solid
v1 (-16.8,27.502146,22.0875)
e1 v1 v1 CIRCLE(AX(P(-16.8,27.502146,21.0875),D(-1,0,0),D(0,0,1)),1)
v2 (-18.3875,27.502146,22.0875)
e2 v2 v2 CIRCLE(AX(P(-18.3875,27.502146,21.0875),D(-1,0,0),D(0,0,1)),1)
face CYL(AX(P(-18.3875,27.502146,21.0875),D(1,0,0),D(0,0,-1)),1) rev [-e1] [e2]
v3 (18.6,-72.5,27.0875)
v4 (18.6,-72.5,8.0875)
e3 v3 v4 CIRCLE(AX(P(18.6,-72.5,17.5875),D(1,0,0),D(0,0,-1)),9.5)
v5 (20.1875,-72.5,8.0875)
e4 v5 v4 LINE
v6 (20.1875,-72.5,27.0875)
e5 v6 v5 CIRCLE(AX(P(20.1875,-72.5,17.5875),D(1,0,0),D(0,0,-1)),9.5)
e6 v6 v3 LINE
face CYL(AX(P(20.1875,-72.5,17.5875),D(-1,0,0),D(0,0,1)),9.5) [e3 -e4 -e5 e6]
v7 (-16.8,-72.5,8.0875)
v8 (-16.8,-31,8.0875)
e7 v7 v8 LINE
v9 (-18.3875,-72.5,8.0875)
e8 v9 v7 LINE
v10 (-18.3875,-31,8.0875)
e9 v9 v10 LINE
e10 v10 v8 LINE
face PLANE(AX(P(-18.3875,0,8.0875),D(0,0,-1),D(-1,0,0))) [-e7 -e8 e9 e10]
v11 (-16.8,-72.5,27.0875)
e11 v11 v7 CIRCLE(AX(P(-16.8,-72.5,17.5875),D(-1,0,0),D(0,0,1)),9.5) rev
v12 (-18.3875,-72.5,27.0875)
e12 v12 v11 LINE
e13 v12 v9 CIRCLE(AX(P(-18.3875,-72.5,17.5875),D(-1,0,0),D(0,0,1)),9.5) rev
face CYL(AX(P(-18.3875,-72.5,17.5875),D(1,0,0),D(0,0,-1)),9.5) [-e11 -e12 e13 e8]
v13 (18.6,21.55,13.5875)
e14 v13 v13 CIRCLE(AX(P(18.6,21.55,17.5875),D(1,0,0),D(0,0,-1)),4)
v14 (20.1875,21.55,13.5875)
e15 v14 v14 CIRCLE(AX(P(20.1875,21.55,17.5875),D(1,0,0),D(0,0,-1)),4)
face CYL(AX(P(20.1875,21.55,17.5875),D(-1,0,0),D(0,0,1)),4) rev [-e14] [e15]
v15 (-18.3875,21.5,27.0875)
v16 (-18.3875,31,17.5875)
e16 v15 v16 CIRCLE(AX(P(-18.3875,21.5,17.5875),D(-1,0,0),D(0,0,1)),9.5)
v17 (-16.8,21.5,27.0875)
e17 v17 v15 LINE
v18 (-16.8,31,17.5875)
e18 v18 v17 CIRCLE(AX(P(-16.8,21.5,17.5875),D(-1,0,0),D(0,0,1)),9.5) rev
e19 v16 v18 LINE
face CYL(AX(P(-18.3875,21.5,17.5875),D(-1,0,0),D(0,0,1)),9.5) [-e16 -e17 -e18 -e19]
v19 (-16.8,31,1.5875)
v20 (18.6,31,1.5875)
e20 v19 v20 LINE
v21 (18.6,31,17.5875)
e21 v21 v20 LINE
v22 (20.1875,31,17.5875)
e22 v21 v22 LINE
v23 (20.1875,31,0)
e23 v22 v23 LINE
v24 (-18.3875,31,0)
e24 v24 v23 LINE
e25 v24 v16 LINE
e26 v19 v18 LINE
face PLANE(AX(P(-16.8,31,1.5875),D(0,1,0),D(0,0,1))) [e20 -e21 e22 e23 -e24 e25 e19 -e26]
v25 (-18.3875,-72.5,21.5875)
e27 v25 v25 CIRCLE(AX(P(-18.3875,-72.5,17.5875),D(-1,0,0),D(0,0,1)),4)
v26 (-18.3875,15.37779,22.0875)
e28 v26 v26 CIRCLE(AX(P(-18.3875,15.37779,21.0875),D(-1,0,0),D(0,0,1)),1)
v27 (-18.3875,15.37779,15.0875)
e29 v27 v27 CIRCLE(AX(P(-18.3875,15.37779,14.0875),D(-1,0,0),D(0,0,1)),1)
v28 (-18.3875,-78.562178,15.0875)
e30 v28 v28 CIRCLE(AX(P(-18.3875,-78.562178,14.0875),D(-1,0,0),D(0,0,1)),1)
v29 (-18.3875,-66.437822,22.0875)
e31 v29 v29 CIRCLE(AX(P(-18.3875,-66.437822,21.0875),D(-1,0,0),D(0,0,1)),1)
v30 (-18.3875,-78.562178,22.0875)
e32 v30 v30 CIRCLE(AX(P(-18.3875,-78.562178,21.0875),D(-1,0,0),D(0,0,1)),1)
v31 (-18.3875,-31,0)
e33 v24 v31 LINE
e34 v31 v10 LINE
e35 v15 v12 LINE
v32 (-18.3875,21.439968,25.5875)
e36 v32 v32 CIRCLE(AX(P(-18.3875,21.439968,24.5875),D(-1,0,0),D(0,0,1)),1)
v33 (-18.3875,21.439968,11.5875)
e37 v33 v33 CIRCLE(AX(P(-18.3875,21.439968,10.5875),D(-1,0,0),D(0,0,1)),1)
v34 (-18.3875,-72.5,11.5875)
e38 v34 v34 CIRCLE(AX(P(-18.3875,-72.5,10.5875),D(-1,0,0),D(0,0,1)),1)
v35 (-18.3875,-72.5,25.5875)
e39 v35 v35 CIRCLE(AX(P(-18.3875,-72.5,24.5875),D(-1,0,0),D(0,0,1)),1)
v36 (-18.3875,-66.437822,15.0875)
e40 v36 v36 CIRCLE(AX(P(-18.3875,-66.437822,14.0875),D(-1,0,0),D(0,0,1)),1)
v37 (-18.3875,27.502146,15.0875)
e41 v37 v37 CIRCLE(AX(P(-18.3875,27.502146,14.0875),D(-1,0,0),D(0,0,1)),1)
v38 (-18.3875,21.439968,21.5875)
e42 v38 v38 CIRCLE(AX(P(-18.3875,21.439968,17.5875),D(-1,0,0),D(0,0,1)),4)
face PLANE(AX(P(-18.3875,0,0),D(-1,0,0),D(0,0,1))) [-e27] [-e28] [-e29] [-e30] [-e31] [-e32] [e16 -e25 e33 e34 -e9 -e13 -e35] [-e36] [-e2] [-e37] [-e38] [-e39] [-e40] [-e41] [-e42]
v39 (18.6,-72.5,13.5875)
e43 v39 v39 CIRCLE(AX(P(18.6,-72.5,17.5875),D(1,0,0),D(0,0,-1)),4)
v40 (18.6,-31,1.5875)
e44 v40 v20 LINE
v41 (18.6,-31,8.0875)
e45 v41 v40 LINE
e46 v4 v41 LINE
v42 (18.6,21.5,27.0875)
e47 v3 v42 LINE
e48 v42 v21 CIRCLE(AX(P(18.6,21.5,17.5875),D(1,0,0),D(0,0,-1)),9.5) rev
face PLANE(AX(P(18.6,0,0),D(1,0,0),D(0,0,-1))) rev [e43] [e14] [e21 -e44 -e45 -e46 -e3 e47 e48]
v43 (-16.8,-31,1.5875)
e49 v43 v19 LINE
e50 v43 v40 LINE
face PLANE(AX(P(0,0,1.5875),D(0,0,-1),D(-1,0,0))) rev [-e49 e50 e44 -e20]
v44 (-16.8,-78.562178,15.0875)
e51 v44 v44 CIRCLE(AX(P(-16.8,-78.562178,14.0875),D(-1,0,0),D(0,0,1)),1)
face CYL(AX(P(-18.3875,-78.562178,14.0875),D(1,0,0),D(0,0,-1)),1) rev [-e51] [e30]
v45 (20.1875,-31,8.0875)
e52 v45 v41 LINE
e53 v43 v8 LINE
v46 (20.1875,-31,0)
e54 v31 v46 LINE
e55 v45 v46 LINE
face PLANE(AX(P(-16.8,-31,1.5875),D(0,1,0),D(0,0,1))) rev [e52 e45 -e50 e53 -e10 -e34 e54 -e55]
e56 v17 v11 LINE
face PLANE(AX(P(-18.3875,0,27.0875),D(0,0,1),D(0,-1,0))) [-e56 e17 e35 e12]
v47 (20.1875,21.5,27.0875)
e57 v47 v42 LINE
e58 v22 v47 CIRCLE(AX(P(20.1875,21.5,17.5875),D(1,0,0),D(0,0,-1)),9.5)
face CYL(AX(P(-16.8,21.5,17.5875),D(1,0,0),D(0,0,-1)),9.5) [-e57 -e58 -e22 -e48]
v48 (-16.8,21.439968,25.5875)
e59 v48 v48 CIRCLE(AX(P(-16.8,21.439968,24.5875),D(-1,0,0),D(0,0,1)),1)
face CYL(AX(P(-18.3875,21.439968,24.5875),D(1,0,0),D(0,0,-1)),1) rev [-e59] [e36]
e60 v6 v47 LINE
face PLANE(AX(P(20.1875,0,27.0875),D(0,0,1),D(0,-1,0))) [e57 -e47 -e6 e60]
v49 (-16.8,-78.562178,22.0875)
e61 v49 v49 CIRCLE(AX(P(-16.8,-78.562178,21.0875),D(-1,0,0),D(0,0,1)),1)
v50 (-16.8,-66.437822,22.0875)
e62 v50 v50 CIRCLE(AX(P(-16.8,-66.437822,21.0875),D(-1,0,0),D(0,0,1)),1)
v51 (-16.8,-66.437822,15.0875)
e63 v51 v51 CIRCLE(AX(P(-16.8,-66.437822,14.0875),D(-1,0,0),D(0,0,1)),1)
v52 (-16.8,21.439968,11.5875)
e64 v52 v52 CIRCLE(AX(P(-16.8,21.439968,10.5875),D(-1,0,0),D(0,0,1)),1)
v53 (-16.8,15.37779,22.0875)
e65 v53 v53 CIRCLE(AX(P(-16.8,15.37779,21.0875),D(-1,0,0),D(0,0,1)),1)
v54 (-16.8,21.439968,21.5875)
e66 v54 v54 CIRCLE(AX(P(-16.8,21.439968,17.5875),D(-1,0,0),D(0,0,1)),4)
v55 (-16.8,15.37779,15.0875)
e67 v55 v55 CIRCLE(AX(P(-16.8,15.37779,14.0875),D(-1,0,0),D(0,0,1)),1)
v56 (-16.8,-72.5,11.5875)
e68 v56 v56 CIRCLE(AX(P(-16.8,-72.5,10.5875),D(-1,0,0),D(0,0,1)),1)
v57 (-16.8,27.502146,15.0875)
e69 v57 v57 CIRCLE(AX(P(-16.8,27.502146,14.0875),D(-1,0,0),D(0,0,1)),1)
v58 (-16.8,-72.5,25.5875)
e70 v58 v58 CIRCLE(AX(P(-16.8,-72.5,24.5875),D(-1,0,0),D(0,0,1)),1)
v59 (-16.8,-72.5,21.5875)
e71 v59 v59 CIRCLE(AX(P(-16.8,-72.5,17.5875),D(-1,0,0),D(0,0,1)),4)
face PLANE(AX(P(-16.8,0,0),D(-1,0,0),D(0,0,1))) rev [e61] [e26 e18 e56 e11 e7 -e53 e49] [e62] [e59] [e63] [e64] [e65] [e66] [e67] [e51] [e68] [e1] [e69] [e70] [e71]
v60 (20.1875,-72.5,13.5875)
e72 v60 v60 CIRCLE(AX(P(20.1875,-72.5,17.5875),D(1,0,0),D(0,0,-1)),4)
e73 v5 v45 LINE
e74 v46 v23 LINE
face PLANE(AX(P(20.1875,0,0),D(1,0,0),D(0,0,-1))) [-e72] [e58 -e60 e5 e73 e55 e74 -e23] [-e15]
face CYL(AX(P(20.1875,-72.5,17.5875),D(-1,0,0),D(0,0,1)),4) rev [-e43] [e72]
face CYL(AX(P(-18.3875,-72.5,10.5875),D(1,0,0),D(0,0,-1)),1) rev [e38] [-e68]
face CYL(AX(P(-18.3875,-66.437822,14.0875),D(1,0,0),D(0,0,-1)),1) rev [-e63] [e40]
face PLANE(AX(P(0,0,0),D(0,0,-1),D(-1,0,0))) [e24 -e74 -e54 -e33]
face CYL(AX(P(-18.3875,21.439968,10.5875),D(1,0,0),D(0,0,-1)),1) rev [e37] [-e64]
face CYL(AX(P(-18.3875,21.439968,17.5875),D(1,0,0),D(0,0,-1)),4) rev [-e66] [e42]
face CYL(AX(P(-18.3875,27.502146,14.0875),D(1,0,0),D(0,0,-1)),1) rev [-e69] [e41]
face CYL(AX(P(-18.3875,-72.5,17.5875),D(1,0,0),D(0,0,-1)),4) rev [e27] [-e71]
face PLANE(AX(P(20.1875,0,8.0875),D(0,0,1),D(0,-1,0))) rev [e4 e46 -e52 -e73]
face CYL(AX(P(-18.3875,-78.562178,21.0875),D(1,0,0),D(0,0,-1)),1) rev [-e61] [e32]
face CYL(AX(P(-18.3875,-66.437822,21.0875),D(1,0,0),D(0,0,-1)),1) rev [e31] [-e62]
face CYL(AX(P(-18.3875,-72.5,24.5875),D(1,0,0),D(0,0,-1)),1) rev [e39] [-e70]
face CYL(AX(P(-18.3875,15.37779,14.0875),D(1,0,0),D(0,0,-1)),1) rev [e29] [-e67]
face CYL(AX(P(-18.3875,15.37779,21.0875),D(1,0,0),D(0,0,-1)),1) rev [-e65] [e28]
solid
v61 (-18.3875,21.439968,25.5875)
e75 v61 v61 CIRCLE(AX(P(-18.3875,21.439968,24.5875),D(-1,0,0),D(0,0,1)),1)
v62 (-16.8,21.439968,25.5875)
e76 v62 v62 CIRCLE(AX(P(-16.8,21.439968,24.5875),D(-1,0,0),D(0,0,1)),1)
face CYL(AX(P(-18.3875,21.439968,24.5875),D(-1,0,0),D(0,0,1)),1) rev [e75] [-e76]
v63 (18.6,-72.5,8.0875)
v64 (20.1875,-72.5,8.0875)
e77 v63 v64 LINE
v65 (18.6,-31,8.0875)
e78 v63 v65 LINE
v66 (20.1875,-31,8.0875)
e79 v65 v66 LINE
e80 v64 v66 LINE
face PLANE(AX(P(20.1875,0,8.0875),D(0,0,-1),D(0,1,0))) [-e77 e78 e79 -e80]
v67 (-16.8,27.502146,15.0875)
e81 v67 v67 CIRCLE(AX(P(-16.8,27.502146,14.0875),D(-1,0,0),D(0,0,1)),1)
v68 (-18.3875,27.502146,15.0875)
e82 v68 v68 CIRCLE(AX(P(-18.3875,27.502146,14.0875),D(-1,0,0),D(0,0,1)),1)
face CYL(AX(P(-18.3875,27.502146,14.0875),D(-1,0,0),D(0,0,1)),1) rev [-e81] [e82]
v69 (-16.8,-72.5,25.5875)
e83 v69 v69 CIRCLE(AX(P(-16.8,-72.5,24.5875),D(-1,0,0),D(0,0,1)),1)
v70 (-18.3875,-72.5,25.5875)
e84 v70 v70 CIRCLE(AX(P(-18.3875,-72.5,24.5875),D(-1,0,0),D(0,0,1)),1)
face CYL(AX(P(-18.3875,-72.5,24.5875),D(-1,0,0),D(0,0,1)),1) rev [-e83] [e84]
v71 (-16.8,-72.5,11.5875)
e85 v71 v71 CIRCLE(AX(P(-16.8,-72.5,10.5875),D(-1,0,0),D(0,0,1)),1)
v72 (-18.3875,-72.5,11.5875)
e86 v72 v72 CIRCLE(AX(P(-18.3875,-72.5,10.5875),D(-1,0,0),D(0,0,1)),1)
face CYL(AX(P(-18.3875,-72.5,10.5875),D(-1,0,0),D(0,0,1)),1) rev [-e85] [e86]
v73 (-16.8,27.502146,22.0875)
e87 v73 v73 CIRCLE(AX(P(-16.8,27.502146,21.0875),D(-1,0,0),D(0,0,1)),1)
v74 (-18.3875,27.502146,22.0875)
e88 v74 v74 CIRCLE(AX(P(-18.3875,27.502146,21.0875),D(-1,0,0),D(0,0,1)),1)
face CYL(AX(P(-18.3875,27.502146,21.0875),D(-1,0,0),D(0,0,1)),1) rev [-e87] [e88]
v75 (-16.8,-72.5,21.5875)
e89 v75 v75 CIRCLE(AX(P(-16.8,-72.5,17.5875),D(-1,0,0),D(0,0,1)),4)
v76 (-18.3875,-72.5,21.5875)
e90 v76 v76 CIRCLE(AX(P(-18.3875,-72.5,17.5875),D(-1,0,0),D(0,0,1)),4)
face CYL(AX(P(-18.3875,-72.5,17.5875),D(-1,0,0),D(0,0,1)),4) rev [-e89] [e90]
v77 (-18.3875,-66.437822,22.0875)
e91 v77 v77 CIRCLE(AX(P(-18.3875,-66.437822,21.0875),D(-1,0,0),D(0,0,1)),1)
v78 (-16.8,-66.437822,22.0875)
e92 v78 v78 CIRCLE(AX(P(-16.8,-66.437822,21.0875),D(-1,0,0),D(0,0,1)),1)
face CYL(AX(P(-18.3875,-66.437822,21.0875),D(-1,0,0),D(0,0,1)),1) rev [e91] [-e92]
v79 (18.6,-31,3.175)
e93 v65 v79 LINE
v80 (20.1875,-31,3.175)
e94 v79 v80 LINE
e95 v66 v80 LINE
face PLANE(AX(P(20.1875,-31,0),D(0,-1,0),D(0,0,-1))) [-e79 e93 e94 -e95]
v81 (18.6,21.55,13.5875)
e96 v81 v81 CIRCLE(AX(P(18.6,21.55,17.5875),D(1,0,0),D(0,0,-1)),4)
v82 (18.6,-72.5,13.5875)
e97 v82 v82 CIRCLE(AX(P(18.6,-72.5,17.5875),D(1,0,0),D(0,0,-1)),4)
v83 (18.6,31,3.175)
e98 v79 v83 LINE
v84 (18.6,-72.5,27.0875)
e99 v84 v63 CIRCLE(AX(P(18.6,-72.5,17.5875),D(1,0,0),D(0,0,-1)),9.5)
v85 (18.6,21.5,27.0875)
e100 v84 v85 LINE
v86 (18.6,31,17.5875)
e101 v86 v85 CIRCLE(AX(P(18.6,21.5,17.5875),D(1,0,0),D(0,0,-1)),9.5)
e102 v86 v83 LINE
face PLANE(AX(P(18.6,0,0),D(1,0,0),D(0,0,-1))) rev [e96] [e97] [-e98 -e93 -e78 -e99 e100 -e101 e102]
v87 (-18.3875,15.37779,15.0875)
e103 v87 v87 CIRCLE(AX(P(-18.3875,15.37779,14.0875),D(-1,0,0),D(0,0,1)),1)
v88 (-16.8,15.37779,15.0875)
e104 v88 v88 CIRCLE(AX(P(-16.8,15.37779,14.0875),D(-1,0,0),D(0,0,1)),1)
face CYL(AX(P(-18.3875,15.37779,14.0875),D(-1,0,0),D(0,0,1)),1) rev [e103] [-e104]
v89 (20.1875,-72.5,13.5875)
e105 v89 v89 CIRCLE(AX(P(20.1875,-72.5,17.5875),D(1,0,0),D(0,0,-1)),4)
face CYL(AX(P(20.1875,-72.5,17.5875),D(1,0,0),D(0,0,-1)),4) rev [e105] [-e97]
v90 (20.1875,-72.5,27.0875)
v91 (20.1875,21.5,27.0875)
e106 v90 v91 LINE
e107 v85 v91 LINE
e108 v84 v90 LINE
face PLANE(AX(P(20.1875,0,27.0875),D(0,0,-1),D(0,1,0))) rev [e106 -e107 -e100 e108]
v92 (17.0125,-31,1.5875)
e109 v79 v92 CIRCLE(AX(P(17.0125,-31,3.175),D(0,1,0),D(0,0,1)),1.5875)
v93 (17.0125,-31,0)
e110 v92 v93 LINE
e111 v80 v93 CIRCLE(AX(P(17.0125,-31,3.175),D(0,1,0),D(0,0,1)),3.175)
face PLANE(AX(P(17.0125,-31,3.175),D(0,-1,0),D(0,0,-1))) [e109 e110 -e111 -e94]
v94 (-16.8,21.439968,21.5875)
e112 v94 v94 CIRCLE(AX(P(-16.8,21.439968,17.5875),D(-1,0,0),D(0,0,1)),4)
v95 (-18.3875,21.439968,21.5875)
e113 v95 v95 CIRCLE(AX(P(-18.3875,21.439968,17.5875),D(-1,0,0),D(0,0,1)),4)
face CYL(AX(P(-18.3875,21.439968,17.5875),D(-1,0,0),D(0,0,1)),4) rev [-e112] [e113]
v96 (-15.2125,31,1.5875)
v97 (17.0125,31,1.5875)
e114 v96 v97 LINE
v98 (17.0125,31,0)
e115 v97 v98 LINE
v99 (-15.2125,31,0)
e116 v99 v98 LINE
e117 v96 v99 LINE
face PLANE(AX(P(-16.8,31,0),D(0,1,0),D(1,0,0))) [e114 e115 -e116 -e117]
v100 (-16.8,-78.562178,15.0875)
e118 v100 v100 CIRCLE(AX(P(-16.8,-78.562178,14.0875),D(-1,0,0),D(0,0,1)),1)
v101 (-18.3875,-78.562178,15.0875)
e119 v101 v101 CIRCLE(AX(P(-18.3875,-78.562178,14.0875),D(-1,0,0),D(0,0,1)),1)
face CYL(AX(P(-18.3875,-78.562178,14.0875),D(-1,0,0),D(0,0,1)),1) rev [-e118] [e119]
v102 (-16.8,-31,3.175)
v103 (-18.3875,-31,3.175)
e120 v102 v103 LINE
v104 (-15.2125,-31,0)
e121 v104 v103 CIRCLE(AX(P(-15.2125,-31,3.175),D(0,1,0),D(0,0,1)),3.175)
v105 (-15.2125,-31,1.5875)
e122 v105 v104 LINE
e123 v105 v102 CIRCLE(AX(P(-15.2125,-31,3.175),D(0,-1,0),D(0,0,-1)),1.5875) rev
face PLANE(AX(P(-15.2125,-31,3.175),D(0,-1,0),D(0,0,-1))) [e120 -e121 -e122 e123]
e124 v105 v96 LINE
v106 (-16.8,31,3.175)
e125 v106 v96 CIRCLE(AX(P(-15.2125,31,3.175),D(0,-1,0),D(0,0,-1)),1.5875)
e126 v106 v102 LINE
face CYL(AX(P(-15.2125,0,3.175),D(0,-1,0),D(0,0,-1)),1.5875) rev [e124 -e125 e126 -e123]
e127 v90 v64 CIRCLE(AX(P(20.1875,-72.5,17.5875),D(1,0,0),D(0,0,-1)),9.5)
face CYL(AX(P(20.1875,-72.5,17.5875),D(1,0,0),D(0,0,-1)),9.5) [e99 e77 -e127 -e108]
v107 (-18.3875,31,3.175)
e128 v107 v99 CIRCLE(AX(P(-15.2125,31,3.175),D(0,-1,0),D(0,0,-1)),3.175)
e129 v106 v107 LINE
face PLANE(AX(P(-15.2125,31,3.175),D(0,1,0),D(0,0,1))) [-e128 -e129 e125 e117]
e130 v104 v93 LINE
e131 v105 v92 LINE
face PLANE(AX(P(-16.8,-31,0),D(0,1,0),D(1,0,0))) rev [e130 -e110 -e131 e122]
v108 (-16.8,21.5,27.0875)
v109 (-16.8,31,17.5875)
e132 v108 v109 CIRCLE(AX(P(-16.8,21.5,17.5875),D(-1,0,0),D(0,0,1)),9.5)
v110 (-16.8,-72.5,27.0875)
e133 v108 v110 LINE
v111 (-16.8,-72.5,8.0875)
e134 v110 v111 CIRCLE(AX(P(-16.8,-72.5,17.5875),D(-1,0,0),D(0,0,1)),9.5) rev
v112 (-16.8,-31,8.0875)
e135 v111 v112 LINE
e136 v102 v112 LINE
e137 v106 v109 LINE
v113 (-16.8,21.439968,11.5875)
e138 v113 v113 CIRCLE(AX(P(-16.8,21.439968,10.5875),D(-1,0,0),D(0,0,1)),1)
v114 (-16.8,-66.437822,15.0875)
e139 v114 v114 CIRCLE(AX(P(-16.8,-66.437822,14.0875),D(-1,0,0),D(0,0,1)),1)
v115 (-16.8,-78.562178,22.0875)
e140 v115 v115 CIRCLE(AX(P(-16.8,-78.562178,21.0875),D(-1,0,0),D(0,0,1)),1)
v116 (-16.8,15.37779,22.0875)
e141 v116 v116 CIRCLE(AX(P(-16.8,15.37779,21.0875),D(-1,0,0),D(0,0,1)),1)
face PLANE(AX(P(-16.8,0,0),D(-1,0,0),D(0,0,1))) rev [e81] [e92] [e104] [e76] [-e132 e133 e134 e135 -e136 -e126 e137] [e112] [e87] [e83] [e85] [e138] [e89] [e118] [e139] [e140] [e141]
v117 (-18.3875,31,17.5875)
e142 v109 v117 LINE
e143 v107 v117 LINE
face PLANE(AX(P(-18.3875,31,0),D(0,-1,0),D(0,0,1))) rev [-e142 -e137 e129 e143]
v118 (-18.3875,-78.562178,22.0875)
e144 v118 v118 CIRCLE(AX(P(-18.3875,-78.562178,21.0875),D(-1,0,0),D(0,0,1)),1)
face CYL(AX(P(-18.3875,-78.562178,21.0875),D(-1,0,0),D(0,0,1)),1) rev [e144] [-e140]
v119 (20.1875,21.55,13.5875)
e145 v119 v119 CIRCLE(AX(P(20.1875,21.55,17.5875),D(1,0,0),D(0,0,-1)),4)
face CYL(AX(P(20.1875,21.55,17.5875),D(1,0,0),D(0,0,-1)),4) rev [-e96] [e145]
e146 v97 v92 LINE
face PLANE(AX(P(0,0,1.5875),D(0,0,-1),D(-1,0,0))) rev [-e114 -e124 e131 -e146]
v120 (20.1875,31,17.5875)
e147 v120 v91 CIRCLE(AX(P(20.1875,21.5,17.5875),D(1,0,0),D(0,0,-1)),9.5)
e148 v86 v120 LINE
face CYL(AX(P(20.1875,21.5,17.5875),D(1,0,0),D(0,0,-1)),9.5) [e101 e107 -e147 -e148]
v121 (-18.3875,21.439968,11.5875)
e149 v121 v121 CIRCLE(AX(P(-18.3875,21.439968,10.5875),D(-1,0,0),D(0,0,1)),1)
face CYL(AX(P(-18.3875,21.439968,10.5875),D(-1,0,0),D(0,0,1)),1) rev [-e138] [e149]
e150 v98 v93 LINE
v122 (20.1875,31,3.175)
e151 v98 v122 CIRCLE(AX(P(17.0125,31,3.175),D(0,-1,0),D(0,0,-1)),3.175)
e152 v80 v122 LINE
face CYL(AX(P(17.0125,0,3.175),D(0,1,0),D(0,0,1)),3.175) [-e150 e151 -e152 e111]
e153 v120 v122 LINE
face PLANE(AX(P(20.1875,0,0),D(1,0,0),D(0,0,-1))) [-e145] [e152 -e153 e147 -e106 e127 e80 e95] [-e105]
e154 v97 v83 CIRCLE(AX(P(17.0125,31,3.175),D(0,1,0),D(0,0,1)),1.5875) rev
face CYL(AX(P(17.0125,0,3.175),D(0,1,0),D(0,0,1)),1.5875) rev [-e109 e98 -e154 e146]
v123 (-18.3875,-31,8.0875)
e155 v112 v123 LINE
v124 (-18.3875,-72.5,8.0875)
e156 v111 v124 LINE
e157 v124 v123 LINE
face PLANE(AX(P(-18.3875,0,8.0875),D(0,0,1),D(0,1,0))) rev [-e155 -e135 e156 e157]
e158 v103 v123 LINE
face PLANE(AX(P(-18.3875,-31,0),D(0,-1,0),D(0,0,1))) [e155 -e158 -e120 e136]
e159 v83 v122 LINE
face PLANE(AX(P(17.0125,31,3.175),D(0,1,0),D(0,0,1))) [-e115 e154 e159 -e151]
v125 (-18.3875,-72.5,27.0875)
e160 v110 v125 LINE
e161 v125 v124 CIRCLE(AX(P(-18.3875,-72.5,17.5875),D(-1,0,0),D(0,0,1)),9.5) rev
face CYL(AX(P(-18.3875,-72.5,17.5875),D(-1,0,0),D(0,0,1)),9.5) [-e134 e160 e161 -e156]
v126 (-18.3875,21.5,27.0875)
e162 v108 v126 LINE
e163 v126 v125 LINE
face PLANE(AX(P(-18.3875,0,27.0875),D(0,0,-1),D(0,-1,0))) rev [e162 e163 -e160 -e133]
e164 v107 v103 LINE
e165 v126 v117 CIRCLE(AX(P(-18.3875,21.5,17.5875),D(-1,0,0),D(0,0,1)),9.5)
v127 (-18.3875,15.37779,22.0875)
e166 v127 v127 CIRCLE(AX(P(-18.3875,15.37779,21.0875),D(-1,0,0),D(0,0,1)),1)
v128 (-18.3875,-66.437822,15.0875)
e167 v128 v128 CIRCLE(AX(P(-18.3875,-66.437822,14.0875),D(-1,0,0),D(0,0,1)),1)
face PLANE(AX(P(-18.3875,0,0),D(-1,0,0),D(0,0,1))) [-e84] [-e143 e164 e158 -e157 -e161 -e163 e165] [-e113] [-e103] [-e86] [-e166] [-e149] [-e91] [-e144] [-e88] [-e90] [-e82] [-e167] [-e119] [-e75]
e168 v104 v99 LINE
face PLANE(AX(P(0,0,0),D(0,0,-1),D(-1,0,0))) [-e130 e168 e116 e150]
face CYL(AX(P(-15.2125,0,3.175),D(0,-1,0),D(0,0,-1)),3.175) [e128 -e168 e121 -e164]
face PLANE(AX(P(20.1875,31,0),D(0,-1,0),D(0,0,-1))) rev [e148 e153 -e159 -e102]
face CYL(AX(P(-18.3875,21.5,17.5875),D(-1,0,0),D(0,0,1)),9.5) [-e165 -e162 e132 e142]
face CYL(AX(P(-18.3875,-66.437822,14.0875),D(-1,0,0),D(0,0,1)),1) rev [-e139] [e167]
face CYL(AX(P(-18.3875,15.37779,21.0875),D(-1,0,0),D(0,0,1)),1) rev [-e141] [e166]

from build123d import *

# Parameters (mm, degrees)
ESQUISSE2_W                      = 35.4
ESQUISSE2_H                      = 62
BOSS_EXTRU_1_DEPTH               = 1.5875
ESQUISSE3_R                      = 4
BOSS_EXTRU_2_DEPTH               = 1.5875
CONG_4_R                         = 9.5
BOSS_EXTRU_3_START               = 1.5875
ESQUISSE4_R                      = 1
ESQUISSE4_R_2                    = 4
BOSS_EXTRU_3_DEPTH               = 1.5875
CONG_7_R                         = 9.5
CONVERTIR_VOLUME1_START          = -15.2125
CONVERTIR_VOLUME1_OUTLINE_W      = 62
CONVERTIR_VOLUME1_OUTLINE_H      = 1.5875
CONVERTIR_VOLUME1_DEPTH          = 32.225
CONVERTIR_VOLUME1_START_2        = 18.6
CONVERTIR_VOLUME1_2_OUTLINE_R    = 1
CONVERTIR_VOLUME1_2_DEPTH        = 1.5875
CONVERTIR_VOLUME1_START_3        = -18.3875
CONVERTIR_VOLUME1_3_DEPTH        = 1.5875
CONVERTIR_VOLUME1_START_4        = -65.437822174
CONVERTIR_VOLUME1_4_OUTLINE_W    = 1.5875
CONVERTIR_VOLUME1_4_OUTLINE_H    = 19
CONVERTIR_VOLUME1_4_DEPTH        = 79.815612528
CONVERTIR_VOLUME1_START_5        = -31
CONVERTIR_VOLUME1_5_DEPTH        = 62
CONVERTIR_VOLUME1_START_6        = -68.4999999
CONVERTIR_VOLUME1_6_OUTLINE_W    = 1.5875
CONVERTIR_VOLUME1_6_OUTLINE_H    = 19
CONVERTIR_VOLUME1_6_DEPTH        = 86.0499998
CONVERTIR_VOLUME1_START_7        = 16.377790454
CONVERTIR_VOLUME1_7_OUTLINE_W    = 1.5875
CONVERTIR_VOLUME1_7_OUTLINE_H    = 19
CONVERTIR_VOLUME1_7_DEPTH        = 1.062177727
CONVERTIR_VOLUME1_8_OUTLINE_W    = 1.5875
CONVERTIR_VOLUME1_8_OUTLINE_H    = 19
CONVERTIR_VOLUME1_8_DEPTH        = 1.062177626
CONVERTIR_VOLUME1_9_OUTLINE_R    = 1
CONVERTIR_VOLUME1_9_OUTLINE_R_2  = 4
CONVERTIR_VOLUME1_9_DEPTH        = 1.5875
CONVERTIR_VOLUME1_10_OUTLINE_R   = 1
CONVERTIR_VOLUME1_10_OUTLINE_R_2 = 4
CONVERTIR_VOLUME1_10_DEPTH       = 1.5875


with BuildPart() as part:
    # Esquisse2 → Boss.-Extru.1 (new body)
    with BuildSketch(Plane.XY):
        with Locations((0.9, 0)):
            Rectangle(ESQUISSE2_W, ESQUISSE2_H)
    extrude(amount=BOSS_EXTRU_1_DEPTH)

    # Esquisse3 → Boss.-Extru.2 (add)
    with BuildSketch(Plane(origin=(18.6, 0, 0), x_dir=(0, 0, -1), z_dir=(1, 0, 0))):
        with BuildLine():
            Line((0, 31), (-27.0875, 31))
            Line((-27.0875, 31), (-27.0875, -72.5))
            ThreePointArc((-27.0875, -72.5), (-17.5875, -82), (-8.0875, -72.5))
            Line((-8.0875, -72.5), (-8.0875, -31))
            Line((-8.0875, -31), (0, -31))
            Line((0, -31), (0, 31))
        make_face()
        with Locations((-17.5875, -72.5)):
            Circle(ESQUISSE3_R, mode=Mode.SUBTRACT)
        with Locations((-17.5875, 21.55)):
            Circle(ESQUISSE3_R, mode=Mode.SUBTRACT)
    extrude(amount=BOSS_EXTRU_2_DEPTH)

    # Congé4
    cong_4_edges = [part.edges().sort_by_distance(p)[0] for p in [
        (19.39375, 31, 27.0875),
    ]]
    fillet(cong_4_edges, radius=CONG_4_R)

    # Esquisse4 → Boss.-Extru.3 (add)
    with BuildSketch(Plane.ZY.offset(16.8).offset(BOSS_EXTRU_3_START)):
        with BuildLine():
            Line((27.0875, 31), (0, 31))
            Line((0, 31), (0, -31))
            Line((0, -31), (8.0875, -31))
            Line((8.0875, -31), (8.0875, -72.5))
            ThreePointArc((8.0875, -72.5), (17.5875, -82), (27.0875, -72.5))
            Line((27.0875, -72.5), (27.0875, 31))
        make_face()
        with Locations((10.5875, -72.5)):
            Circle(ESQUISSE4_R, mode=Mode.SUBTRACT)
        with Locations((14.0875, -78.562177826)):
            Circle(ESQUISSE4_R, mode=Mode.SUBTRACT)
        with Locations(Location((17.5875, -72.5, 0), (0, 0, 180))):
            Circle(ESQUISSE4_R_2, mode=Mode.SUBTRACT)
        with Locations((14.0875, -66.437822174)):
            Circle(ESQUISSE4_R, mode=Mode.SUBTRACT)
        with Locations((21.0875, -78.562177826)):
            Circle(ESQUISSE4_R, mode=Mode.SUBTRACT)
        with Locations((24.5875, -72.5)):
            Circle(ESQUISSE4_R, mode=Mode.SUBTRACT)
        with Locations((21.0875, -66.437822174)):
            Circle(ESQUISSE4_R, mode=Mode.SUBTRACT)
        with Locations((10.5875, 21.439968281)):
            Circle(ESQUISSE4_R, mode=Mode.SUBTRACT)
        with Locations((14.0875, 15.377790454)):
            Circle(ESQUISSE4_R, mode=Mode.SUBTRACT)
        with Locations((14.0875, 27.502146107)):
            Circle(ESQUISSE4_R, mode=Mode.SUBTRACT)
        with Locations((17.5875, 21.439968281)):
            Circle(ESQUISSE4_R_2, mode=Mode.SUBTRACT)
        with Locations((21.0875, 15.377790454)):
            Circle(ESQUISSE4_R, mode=Mode.SUBTRACT)
        with Locations((21.0875, 27.502146107)):
            Circle(ESQUISSE4_R, mode=Mode.SUBTRACT)
        with Locations((24.5875, 21.439968281)):
            Circle(ESQUISSE4_R, mode=Mode.SUBTRACT)
    extrude(amount=-BOSS_EXTRU_3_DEPTH)

    # Congé7
    cong_7_edges = [part.edges().sort_by_distance(p)[0] for p in [
        (-17.59375, 31, 27.0875),
    ]]
    fillet(cong_7_edges, radius=CONG_7_R)


with BuildPart() as body_2:
    # Convertir-Volume1: read off the stored shape, not the designer's step
    # Convertir-Volume1 outline → Convertir-Volume1 (new body)
    with BuildSketch(Plane.YZ.offset(CONVERTIR_VOLUME1_START)):
        with Locations((0, 0.79375)):
            Rectangle(CONVERTIR_VOLUME1_OUTLINE_W, CONVERTIR_VOLUME1_OUTLINE_H)
    extrude(amount=CONVERTIR_VOLUME1_DEPTH)

    # Convertir-Volume1 2 outline → Convertir-Volume1 2 (add)
    with BuildSketch(Plane.YZ.offset(CONVERTIR_VOLUME1_START_2)):
        with BuildLine():
            ThreePointArc((21.49498414, 13.587878361), (17.55, 17.5875), (21.49498414, 21.587121639))
            ThreePointArc((21.49498414, 21.587121639), (17.439968281, 17.5875), (21.49498414, 13.587878361))
        make_face()
        with Locations((15.377790454, 21.0875)):
            Circle(CONVERTIR_VOLUME1_2_OUTLINE_R)
        with Locations((21.439968281, 24.5875)):
            Circle(CONVERTIR_VOLUME1_2_OUTLINE_R)
        with Locations((27.502146107, 21.0875)):
            Circle(CONVERTIR_VOLUME1_2_OUTLINE_R)
        with Locations((27.502146107, 14.0875)):
            Circle(CONVERTIR_VOLUME1_2_OUTLINE_R)
        with Locations((21.439968281, 10.5875)):
            Circle(CONVERTIR_VOLUME1_2_OUTLINE_R)
        with Locations((15.377790454, 14.0875)):
            Circle(CONVERTIR_VOLUME1_2_OUTLINE_R)
        with Locations((-78.562177826, 21.0875)):
            Circle(CONVERTIR_VOLUME1_2_OUTLINE_R)
        with Locations((-72.5, 24.5875)):
            Circle(CONVERTIR_VOLUME1_2_OUTLINE_R)
        with Locations((-66.437822174, 21.0875)):
            Circle(CONVERTIR_VOLUME1_2_OUTLINE_R)
        with Locations((-66.437822174, 14.0875)):
            Circle(CONVERTIR_VOLUME1_2_OUTLINE_R)
        with Locations((-72.5, 10.5875)):
            Circle(CONVERTIR_VOLUME1_2_OUTLINE_R)
        with Locations((-78.562177826, 14.0875)):
            Circle(CONVERTIR_VOLUME1_2_OUTLINE_R)
    extrude(amount=CONVERTIR_VOLUME1_2_DEPTH)

    # Convertir-Volume1 3 outline → Convertir-Volume1 3 (add)
    with BuildSketch(Plane.YZ.offset(CONVERTIR_VOLUME1_START_3)):
        with BuildLine():
            ThreePointArc((21.49498414, 13.587878361), (25.55, 17.5875), (21.49498414, 21.587121639))
            ThreePointArc((21.49498414, 21.587121639), (25.439968281, 17.5875), (21.49498414, 13.587878361))
        make_face()
    extrude(amount=CONVERTIR_VOLUME1_3_DEPTH)

    # Convertir-Volume1 4 outline → Convertir-Volume1 4 (add)
    with BuildSketch(Plane(origin=(0, 0, 0), x_dir=(1, 0, 0), z_dir=(0, 1, 0)).offset(CONVERTIR_VOLUME1_START_4)):
        with Locations((19.39375, -17.5875)):
            Rectangle(CONVERTIR_VOLUME1_4_OUTLINE_W, CONVERTIR_VOLUME1_4_OUTLINE_H)
        with Locations((-17.59375, -17.5875)):
            Rectangle(CONVERTIR_VOLUME1_4_OUTLINE_W, CONVERTIR_VOLUME1_4_OUTLINE_H)
    extrude(amount=CONVERTIR_VOLUME1_4_DEPTH)

    # Convertir-Volume1 5 outline → Convertir-Volume1 5 (add)
    with BuildSketch(Plane(origin=(0, 0, 0), x_dir=(1, 0, 0), z_dir=(0, 1, 0)).offset(CONVERTIR_VOLUME1_START_5)):
        with BuildLine():
            Line((18.6, -8.0875), (20.1875, -8.0875))
            Line((20.1875, -8.0875), (20.1875, -3.175))
            ThreePointArc((20.1875, -3.175), (19.25756403, -0.92993597), (17.0125, 0))
            Line((17.0125, 0), (17.0125, -1.5875))
            ThreePointArc((17.0125, -1.5875), (18.135032015, -2.052467985), (18.6, -3.175))
            Line((18.6, -3.175), (18.6, -8.0875))
        make_face()
        with BuildLine():
            Line((-18.3875, -8.0875), (-16.8, -8.0875))
            Line((-16.8, -8.0875), (-16.8, -3.175))
            ThreePointArc((-16.8, -3.175), (-16.335032015, -2.052467985), (-15.2125, -1.5875))
            Line((-15.2125, -1.5875), (-15.2125, 0))
            ThreePointArc((-15.2125, 0), (-17.45756403, -0.92993597), (-18.3875, -3.175))
            Line((-18.3875, -3.175), (-18.3875, -8.0875))
        make_face()
    extrude(amount=CONVERTIR_VOLUME1_5_DEPTH)

    # Convertir-Volume1 6 outline → Convertir-Volume1 6 (add)
    with BuildSketch(Plane(origin=(0, 0, 0), x_dir=(1, 0, 0), z_dir=(0, 1, 0)).offset(CONVERTIR_VOLUME1_START_6)):
        with Locations((19.39375, -17.5875)):
            Rectangle(CONVERTIR_VOLUME1_6_OUTLINE_W, CONVERTIR_VOLUME1_6_OUTLINE_H)
    extrude(amount=CONVERTIR_VOLUME1_6_DEPTH)

    # Convertir-Volume1 7 outline → Convertir-Volume1 7 (add)
    with BuildSketch(Plane(origin=(0, 0, 0), x_dir=(1, 0, 0), z_dir=(0, 1, 0)).offset(CONVERTIR_VOLUME1_START_7)):
        with Locations((-17.59375, -17.5875)):
            Rectangle(CONVERTIR_VOLUME1_7_OUTLINE_W, CONVERTIR_VOLUME1_7_OUTLINE_H)
    extrude(amount=CONVERTIR_VOLUME1_7_DEPTH)

    # Convertir-Volume1 8 outline → Convertir-Volume1 8 (add)
    with BuildSketch(Plane(origin=(0, 0, 0), x_dir=(1, 0, 0), z_dir=(0, 1, 0)).offset(CONVERTIR_VOLUME1_START_6)):
        with Locations((-17.59375, -17.5875)):
            Rectangle(CONVERTIR_VOLUME1_8_OUTLINE_W, CONVERTIR_VOLUME1_8_OUTLINE_H)
    extrude(amount=CONVERTIR_VOLUME1_8_DEPTH)

    # Convertir-Volume1 9 outline → Convertir-Volume1 9 (add)
    with BuildSketch(Plane.YZ.offset(CONVERTIR_VOLUME1_START_3)):
        with BuildLine():
            Line((31, 3.175), (31, 17.5875))
            ThreePointArc((31, 17.5875), (28.217514421, 24.305014421), (21.5, 27.0875))
            Line((21.5, 27.0875), (-72.5, 27.0875))
            ThreePointArc((-72.5, 27.0875), (-82, 17.5875), (-72.5, 8.0875))
            Line((-72.5, 8.0875), (-31, 8.0875))
            Line((-31, 8.0875), (-31, 3.175))
            Line((-31, 3.175), (31, 3.175))
        make_face()
        with Locations((-72.5, 10.5875)):
            Circle(CONVERTIR_VOLUME1_9_OUTLINE_R, mode=Mode.SUBTRACT)
        with Locations((-78.562177826, 14.0875)):
            Circle(CONVERTIR_VOLUME1_9_OUTLINE_R, mode=Mode.SUBTRACT)
        with Locations((-66.437822174, 14.0875)):
            Circle(CONVERTIR_VOLUME1_9_OUTLINE_R, mode=Mode.SUBTRACT)
        with Locations((21.439968281, 10.5875)):
            Circle(CONVERTIR_VOLUME1_9_OUTLINE_R, mode=Mode.SUBTRACT)
        with Locations((15.377790454, 14.0875)):
            Circle(CONVERTIR_VOLUME1_9_OUTLINE_R, mode=Mode.SUBTRACT)
        with Locations((27.502146107, 14.0875)):
            Circle(CONVERTIR_VOLUME1_9_OUTLINE_R, mode=Mode.SUBTRACT)
        with Locations((-72.5, 17.5875)):
            Circle(CONVERTIR_VOLUME1_9_OUTLINE_R_2, mode=Mode.SUBTRACT)
        with Locations((-78.562177826, 21.0875)):
            Circle(CONVERTIR_VOLUME1_9_OUTLINE_R, mode=Mode.SUBTRACT)
        with Locations((-66.437822174, 21.0875)):
            Circle(CONVERTIR_VOLUME1_9_OUTLINE_R, mode=Mode.SUBTRACT)
        with Locations((-72.5, 24.5875)):
            Circle(CONVERTIR_VOLUME1_9_OUTLINE_R, mode=Mode.SUBTRACT)
        with BuildLine():
            ThreePointArc((21.49498414, 13.587878361), (17.439968281, 17.5875), (21.49498414, 21.587121639))
            ThreePointArc((21.49498414, 21.587121639), (25.55, 17.5875), (21.49498414, 13.587878361))
        make_face(mode=Mode.SUBTRACT)
        with Locations((15.377790454, 21.0875)):
            Circle(CONVERTIR_VOLUME1_9_OUTLINE_R, mode=Mode.SUBTRACT)
        with Locations((27.502146107, 21.0875)):
            Circle(CONVERTIR_VOLUME1_9_OUTLINE_R, mode=Mode.SUBTRACT)
        with Locations((21.439968281, 24.5875)):
            Circle(CONVERTIR_VOLUME1_9_OUTLINE_R, mode=Mode.SUBTRACT)
    extrude(amount=CONVERTIR_VOLUME1_9_DEPTH)

    # Convertir-Volume1 10 outline → Convertir-Volume1 10 (add)
    with BuildSketch(Plane.YZ.offset(CONVERTIR_VOLUME1_START_2)):
        with BuildLine():
            Line((31, 3.175), (31, 17.5875))
            ThreePointArc((31, 17.5875), (28.217514421, 24.305014421), (21.5, 27.0875))
            Line((21.5, 27.0875), (-72.5, 27.0875))
            ThreePointArc((-72.5, 27.0875), (-82, 17.5875), (-72.5, 8.0875))
            Line((-72.5, 8.0875), (-31, 8.0875))
            Line((-31, 8.0875), (-31, 3.175))
            Line((-31, 3.175), (31, 3.175))
        make_face()
        with Locations((-72.5, 10.5875)):
            Circle(CONVERTIR_VOLUME1_10_OUTLINE_R, mode=Mode.SUBTRACT)
        with Locations((-78.562177826, 14.0875)):
            Circle(CONVERTIR_VOLUME1_10_OUTLINE_R, mode=Mode.SUBTRACT)
        with Locations((-66.437822174, 14.0875)):
            Circle(CONVERTIR_VOLUME1_10_OUTLINE_R, mode=Mode.SUBTRACT)
        with Locations((21.439968281, 10.5875)):
            Circle(CONVERTIR_VOLUME1_10_OUTLINE_R, mode=Mode.SUBTRACT)
        with Locations((15.377790454, 14.0875)):
            Circle(CONVERTIR_VOLUME1_10_OUTLINE_R, mode=Mode.SUBTRACT)
        with Locations((27.502146107, 14.0875)):
            Circle(CONVERTIR_VOLUME1_10_OUTLINE_R, mode=Mode.SUBTRACT)
        with Locations((-72.5, 17.5875)):
            Circle(CONVERTIR_VOLUME1_10_OUTLINE_R_2, mode=Mode.SUBTRACT)
        with Locations((-78.562177826, 21.0875)):
            Circle(CONVERTIR_VOLUME1_10_OUTLINE_R, mode=Mode.SUBTRACT)
        with Locations((-66.437822174, 21.0875)):
            Circle(CONVERTIR_VOLUME1_10_OUTLINE_R, mode=Mode.SUBTRACT)
        with Locations((-72.5, 24.5875)):
            Circle(CONVERTIR_VOLUME1_10_OUTLINE_R, mode=Mode.SUBTRACT)
        with BuildLine():
            ThreePointArc((21.49498414, 13.587878361), (17.439968281, 17.5875), (21.49498414, 21.587121639))
            ThreePointArc((21.49498414, 21.587121639), (25.55, 17.5875), (21.49498414, 13.587878361))
        make_face(mode=Mode.SUBTRACT)
        with Locations((15.377790454, 21.0875)):
            Circle(CONVERTIR_VOLUME1_10_OUTLINE_R, mode=Mode.SUBTRACT)
        with Locations((27.502146107, 21.0875)):
            Circle(CONVERTIR_VOLUME1_10_OUTLINE_R, mode=Mode.SUBTRACT)
        with Locations((21.439968281, 24.5875)):
            Circle(CONVERTIR_VOLUME1_10_OUTLINE_R, mode=Mode.SUBTRACT)
    extrude(amount=CONVERTIR_VOLUME1_10_DEPTH)


solid = Compound([part.part, body_2.part])
